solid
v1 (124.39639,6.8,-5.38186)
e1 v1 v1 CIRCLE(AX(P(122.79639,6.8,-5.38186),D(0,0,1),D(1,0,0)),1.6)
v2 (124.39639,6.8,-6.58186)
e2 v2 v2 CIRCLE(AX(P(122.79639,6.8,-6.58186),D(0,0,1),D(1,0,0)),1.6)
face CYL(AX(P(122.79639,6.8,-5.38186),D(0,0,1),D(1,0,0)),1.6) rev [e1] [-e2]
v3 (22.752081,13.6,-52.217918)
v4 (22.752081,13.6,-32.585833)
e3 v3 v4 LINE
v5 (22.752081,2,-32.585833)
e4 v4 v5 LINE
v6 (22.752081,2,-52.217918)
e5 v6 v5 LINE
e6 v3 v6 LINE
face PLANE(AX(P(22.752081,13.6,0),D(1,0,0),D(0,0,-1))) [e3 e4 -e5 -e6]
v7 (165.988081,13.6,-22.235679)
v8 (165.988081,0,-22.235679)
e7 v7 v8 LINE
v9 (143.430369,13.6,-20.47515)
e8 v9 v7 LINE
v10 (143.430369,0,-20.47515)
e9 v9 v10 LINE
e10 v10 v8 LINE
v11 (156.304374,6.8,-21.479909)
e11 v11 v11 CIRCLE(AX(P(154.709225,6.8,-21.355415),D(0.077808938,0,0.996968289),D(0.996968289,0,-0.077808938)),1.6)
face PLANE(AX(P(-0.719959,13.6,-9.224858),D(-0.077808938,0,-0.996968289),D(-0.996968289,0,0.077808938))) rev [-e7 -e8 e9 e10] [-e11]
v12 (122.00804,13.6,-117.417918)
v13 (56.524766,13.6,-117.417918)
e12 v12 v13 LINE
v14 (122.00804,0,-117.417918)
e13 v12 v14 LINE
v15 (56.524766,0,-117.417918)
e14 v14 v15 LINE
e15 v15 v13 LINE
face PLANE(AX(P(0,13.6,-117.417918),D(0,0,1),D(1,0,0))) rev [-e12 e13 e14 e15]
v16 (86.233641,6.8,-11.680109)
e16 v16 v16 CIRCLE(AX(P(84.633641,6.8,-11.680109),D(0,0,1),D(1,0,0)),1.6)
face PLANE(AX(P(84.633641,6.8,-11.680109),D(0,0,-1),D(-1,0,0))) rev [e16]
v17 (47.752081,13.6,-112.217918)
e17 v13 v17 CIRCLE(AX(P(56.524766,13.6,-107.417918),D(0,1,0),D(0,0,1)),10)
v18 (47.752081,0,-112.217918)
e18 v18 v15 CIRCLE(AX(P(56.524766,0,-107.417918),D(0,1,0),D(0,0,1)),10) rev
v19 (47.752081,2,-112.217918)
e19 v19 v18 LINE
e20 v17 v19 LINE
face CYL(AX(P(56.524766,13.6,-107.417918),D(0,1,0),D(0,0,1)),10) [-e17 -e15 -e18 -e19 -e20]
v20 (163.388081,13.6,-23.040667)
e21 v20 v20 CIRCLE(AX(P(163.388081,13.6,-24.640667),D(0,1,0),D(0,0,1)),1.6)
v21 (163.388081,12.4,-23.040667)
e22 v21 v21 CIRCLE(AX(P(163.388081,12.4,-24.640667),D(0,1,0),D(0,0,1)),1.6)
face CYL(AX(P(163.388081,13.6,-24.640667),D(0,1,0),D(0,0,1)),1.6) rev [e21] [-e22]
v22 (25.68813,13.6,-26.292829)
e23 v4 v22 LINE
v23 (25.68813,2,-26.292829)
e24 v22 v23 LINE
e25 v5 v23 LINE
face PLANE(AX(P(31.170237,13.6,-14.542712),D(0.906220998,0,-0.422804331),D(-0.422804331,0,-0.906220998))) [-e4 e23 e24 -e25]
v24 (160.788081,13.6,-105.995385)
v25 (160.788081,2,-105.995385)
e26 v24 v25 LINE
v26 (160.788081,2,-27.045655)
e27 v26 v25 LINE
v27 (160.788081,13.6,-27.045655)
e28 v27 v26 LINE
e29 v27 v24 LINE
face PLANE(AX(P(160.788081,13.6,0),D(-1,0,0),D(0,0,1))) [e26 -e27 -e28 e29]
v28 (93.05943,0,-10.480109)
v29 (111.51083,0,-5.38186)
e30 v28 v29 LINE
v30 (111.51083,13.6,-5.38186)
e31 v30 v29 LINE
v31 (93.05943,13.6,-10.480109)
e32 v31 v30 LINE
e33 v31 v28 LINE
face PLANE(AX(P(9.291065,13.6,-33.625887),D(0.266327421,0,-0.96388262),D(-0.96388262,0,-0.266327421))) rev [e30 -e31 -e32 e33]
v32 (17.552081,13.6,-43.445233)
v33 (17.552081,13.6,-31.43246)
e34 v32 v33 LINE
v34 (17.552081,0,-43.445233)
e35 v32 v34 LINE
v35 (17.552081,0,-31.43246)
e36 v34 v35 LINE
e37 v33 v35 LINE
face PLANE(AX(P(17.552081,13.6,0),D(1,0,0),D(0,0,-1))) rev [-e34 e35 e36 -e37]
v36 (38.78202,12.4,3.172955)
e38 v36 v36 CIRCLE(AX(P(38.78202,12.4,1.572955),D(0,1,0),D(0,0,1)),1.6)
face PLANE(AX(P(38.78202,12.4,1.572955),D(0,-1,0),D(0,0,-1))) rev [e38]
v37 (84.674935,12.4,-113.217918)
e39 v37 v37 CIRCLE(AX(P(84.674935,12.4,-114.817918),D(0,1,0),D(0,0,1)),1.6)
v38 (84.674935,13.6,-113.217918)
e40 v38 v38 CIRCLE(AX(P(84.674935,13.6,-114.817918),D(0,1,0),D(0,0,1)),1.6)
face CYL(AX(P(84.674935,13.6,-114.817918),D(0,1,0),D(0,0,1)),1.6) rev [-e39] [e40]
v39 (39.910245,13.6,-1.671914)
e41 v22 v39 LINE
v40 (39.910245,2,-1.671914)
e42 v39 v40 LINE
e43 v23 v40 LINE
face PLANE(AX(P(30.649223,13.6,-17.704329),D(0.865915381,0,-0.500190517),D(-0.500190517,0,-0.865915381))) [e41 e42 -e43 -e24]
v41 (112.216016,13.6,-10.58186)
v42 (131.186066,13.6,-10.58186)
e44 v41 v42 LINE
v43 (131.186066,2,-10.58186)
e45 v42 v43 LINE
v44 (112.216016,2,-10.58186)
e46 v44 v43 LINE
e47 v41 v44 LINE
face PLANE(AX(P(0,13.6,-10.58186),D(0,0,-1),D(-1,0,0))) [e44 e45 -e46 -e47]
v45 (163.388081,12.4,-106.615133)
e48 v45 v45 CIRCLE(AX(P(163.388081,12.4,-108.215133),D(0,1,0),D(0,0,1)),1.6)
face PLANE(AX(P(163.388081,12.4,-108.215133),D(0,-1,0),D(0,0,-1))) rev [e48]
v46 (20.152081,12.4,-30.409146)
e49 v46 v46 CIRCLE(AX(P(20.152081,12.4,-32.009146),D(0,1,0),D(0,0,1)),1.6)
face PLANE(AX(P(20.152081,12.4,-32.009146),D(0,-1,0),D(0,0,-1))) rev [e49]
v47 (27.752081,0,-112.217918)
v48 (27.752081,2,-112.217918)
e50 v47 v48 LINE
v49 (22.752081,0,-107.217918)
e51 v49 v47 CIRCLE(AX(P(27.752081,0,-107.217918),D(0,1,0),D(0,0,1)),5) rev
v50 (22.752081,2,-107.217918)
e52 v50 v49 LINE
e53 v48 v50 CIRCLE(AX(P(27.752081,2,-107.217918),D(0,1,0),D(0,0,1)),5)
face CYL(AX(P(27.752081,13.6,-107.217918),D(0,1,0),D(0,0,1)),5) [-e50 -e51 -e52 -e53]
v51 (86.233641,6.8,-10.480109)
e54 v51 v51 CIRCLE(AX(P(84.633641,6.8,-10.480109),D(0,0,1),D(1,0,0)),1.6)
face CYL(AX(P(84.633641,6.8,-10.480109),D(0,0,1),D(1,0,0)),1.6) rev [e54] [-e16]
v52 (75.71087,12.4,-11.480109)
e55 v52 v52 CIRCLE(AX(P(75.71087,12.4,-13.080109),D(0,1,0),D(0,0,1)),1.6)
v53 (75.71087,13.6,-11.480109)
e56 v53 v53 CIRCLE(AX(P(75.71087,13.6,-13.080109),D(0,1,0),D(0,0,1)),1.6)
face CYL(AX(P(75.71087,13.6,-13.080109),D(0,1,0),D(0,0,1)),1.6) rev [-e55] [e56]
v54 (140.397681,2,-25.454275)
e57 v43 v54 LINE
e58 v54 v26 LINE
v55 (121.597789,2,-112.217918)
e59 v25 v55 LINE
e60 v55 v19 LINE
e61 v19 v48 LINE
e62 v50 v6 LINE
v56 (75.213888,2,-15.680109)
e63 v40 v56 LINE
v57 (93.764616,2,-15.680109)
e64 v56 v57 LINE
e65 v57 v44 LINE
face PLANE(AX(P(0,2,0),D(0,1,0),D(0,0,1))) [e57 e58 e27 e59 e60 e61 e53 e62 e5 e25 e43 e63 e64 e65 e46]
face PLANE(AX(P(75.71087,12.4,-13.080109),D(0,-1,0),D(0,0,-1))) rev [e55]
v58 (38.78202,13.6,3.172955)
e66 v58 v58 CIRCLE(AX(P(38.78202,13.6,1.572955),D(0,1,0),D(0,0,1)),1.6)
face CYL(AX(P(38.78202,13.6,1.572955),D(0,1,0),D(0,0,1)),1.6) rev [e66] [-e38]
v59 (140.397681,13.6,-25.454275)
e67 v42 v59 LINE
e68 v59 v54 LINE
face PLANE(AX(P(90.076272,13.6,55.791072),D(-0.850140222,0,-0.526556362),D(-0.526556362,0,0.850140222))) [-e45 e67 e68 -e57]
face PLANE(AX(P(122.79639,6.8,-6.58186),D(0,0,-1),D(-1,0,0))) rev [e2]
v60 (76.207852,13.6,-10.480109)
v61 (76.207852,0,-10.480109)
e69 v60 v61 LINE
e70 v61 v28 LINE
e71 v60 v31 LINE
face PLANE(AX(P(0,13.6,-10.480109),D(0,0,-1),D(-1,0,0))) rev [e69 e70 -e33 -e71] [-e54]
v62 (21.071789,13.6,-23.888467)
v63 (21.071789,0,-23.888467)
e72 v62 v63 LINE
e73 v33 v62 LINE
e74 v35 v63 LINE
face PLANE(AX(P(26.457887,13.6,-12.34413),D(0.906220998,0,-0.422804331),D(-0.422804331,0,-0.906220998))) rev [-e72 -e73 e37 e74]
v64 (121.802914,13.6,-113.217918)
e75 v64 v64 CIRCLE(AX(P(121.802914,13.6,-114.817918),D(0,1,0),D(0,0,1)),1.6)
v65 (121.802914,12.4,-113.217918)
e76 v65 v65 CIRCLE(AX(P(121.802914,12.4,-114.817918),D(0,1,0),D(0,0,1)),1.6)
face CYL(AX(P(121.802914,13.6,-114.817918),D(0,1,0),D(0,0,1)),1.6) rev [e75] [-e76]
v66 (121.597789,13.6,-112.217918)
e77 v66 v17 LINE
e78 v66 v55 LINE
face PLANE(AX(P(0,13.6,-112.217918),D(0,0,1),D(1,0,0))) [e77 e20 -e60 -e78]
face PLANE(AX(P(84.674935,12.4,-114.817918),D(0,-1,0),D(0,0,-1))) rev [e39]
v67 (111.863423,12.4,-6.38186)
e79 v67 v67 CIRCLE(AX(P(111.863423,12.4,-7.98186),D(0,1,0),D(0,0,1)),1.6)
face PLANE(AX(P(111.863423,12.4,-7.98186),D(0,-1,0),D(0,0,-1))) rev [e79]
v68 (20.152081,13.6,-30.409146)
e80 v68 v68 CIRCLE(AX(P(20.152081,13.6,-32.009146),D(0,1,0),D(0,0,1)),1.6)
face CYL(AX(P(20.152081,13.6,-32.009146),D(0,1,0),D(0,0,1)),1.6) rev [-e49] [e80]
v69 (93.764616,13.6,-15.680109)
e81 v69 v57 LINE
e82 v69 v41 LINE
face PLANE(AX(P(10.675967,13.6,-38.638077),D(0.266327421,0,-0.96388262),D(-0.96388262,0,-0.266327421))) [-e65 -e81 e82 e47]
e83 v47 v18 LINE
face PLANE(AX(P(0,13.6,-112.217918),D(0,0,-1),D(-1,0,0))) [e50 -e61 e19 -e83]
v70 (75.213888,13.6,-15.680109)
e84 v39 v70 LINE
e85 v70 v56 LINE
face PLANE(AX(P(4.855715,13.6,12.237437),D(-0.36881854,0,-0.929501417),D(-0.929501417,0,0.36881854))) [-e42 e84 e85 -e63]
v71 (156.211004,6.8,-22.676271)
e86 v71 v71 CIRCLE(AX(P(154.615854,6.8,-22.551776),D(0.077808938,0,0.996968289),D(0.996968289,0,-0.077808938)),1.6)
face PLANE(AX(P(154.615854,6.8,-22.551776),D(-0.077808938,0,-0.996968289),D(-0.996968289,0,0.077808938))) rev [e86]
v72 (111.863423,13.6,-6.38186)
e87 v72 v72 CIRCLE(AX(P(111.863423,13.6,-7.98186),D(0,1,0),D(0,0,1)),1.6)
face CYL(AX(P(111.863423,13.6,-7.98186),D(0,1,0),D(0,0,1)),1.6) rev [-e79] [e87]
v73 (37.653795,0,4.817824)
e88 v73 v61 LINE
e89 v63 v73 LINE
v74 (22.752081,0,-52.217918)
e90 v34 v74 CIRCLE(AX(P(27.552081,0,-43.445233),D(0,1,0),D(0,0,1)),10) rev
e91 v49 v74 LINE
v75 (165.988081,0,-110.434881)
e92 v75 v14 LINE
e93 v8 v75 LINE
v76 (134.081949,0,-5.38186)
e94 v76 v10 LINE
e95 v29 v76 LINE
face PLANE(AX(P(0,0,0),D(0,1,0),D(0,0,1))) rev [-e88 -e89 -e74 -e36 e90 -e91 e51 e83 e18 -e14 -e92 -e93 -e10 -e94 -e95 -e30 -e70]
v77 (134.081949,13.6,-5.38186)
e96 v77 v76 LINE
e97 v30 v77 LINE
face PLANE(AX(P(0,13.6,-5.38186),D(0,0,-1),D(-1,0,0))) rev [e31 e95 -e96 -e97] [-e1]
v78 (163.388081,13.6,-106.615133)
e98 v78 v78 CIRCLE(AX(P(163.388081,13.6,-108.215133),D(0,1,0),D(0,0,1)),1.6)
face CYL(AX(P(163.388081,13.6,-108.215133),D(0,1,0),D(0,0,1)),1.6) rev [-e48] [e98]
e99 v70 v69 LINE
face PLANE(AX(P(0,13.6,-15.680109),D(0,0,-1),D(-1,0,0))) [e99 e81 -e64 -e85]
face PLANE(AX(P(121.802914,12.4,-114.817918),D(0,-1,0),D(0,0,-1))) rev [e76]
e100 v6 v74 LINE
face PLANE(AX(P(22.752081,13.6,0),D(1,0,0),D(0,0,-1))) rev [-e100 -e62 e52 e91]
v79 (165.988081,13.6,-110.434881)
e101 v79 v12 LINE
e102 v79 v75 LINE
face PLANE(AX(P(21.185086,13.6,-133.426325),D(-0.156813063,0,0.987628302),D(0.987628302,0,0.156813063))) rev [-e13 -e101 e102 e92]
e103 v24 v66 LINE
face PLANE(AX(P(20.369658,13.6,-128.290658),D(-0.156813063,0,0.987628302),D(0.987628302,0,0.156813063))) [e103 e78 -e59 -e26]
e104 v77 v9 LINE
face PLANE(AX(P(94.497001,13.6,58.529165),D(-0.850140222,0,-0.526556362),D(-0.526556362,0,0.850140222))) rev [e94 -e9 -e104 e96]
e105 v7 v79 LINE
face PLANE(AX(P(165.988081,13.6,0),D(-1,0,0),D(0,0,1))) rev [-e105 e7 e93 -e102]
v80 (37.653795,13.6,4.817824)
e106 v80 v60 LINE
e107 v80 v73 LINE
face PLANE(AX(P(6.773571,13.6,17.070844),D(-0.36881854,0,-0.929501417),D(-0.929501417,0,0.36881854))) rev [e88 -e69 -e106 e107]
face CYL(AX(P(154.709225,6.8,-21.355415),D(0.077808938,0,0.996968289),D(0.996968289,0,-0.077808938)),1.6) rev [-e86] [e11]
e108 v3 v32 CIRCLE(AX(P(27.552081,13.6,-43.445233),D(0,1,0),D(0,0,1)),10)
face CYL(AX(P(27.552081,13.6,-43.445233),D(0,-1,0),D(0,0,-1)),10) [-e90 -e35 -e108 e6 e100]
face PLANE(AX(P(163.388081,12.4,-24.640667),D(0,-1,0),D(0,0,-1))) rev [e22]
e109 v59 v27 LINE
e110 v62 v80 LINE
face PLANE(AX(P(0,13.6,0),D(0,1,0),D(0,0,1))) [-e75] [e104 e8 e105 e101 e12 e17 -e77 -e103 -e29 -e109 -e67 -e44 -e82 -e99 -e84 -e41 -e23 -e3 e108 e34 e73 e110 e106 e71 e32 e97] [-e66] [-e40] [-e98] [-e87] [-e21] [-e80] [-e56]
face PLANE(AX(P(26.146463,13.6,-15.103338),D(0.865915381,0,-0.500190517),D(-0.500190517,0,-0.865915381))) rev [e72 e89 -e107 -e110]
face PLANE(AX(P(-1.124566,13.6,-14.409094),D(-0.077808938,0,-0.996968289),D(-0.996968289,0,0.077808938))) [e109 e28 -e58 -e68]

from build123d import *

# Parameters (mm, degrees)
BOSS_EXTRUDE1_DEPTH = 2
BOSS_EXTRUDE2_DEPTH = 13.6
CUT_EXTRUDE1_DEPTH  = 204.774312539
TOP_HOLES_D         = 3.2
TOP_HOLES_DEPTH     = 1.2
WRIST_1_D           = 3.2
WRIST_1_DEPTH       = 1.2
WRIST_2_D           = 3.2
WRIST_2_DEPTH       = 1.2
WRIST_3_D           = 3.2
WRIST_3_DEPTH       = 1.2
FILLET1_R           = 5
FILLET2_R           = 10
FILLET3_R           = 10


with BuildPart() as part:
    # outline → Boss-Extrude1 (new body)
    with BuildSketch(Plane(origin=(0, 0, 0), x_dir=(1, 0, 0), z_dir=(0, 1, 0))):
        Polygon((22.752080985, 112.217917805), (22.752080985, 32.585832501), (25.688129691, 26.292829341), (39.910245267, 1.671913524), (75.213887712, 15.680109343), (93.764616437, 15.680109343), (112.21601573, 10.581860359), (131.186066133, 10.581860359), (140.397681326, 25.454275085), (160.788080985, 27.045655036), (160.788080985, 105.9953847), (121.597788595, 112.217917805), align=None)
    extrude(amount=BOSS_EXTRUDE1_DEPTH)

    # outline<7> → Boss-Extrude2 (add)
    with BuildSketch(Plane(origin=(0, 0, 0), x_dir=(1, 0, 0), z_dir=(0, 1, 0))):
        Polygon((165.988080985, 110.434880876), (122.008040315, 117.417917805), (17.552080985, 117.417917805), (17.552080985, 31.432460189), (21.071788866, 23.888466533), (37.653795388, -4.817824349), (76.207852469, 10.480109343), (93.059430407, 10.480109343), (111.510829699, 5.381860359), (134.081949487, 5.381860359), (143.430369308, 20.475150048), (165.988080985, 22.235679058), align=None)
        Polygon((121.597788595, 112.217917805), (22.752080985, 112.217917805), (22.752080985, 32.585832501), (25.688129691, 26.292829341), (39.910245267, 1.671913524), (75.213887712, 15.680109343), (93.764616437, 15.680109343), (112.21601573, 10.581860359), (131.186066133, 10.581860359), (140.397681326, 25.454275085), (160.788080985, 27.045655036), (160.788080985, 105.9953847), align=None, mode=Mode.SUBTRACT)
    extrude(amount=BOSS_EXTRUDE2_DEPTH)

    # cutout → Cut-Extrude1 (cut, through all)
    with BuildSketch(Plane(origin=(0, 0, 0), x_dir=(1, 0, 0), z_dir=(0, 1, 0))):
        Polygon((17.552080985, 117.417917805), (17.552080985, 52.217917805), (22.752080985, 52.217917805), (22.752080985, 112.217917805), (47.752080985, 112.217917805), (47.752080985, 117.417917805), align=None)
    extrude(amount=CUT_EXTRUDE1_DEPTH, mode=Mode.SUBTRACT)

    # top holes
    with Locations(Plane(origin=(0, 13.6, 0), x_dir=(1, 0, 0), z_dir=(0, 1, 0))):
        with Locations((84.67493479, 114.817917805), (20.152080985, 32.009146345), (38.782020327, -1.572955412), (75.710870091, 13.080109343), (111.863422715, 7.981860359), (163.388080985, 24.640667047), (163.388080985, 108.215132788), (121.802914455, 114.817917805)):
            Hole(TOP_HOLES_D / 2, depth=TOP_HOLES_DEPTH)

    # wrist 1
    with Locations(Plane.XY.offset(-10.480109343)):
        with Locations((84.633641438, 6.8)):
            Hole(WRIST_1_D / 2, depth=WRIST_1_DEPTH)

    # wrist 2
    with Locations(Plane.XY.offset(-5.381860359)):
        with Locations((122.796389593, 6.8)):
            Hole(WRIST_2_D / 2, depth=WRIST_2_DEPTH)

    # wrist 3
    with Locations(Plane(origin=(-0.719959147, 0, -9.224858415), x_dir=(0.9969682889311796, 0, -0.07780893821172487), z_dir=(0.07780893821172487, 0, 0.9969682889311796))):
        with Locations((155.901833608, 6.8)):
            Hole(WRIST_3_D / 2, depth=WRIST_3_DEPTH)

    # Fillet1
    fillet1_edges = [part.edges().sort_by_distance(p)[0] for p in [
        (22.752080985, 1, -112.217917805),
    ]]
    fillet(fillet1_edges, radius=FILLET1_R)

    # Fillet2
    # the kernel refuses this fillet: 10 mm, written as the material it takes off along each edge
    with BuildSketch(Plane(origin=(47.752080985, -21.931712199, -117.417917805), x_dir=(0, 0, 1), z_dir=(0, 1, 0))) as fillet2_piece_1:
        with BuildLine():
            CenterArc((10, 8.77268488), FILLET2_R, 180, 61.314597986)
            Line((0, 8.77268488), (-0.2, 8.77268488))
            Line((-0.2, 8.77268488), (-0.2, 0))
            Line((-0.2, 0), (0, -0.2))
            ThreePointArc((0, -0.2), (2.6, -0.2), (5.104, -0.175453698))
            Line((5.104, -0.175453698), (5.2, 0))
        make_face()
    extrude(amount=57.463424399, mode=Mode.SUBTRACT)

    # Fillet3
    # the kernel refuses this fillet: 10 mm, written as the material it takes off along each edge
    with BuildSketch(Plane(origin=(17.552080985, -21.931712199, -52.217917805), x_dir=(0, 0, 1), z_dir=(0, 1, 0))) as fillet3_piece_1:
        with BuildLine():
            CenterArc((8.77268488, 10), FILLET3_R, 208.685402014, 61.314597986)
            Line((0, 5.2), (-0.175453698, 5.104))
            ThreePointArc((-0.175453698, 5.104), (-0.2, 2.6), (-0.2, 0))
            Line((-0.2, 0), (0, -0.2))
            Line((0, -0.2), (8.77268488, -0.2))
            Line((8.77268488, -0.2), (8.77268488, 0))
        make_face()
    extrude(amount=57.463424399, mode=Mode.SUBTRACT)


solid = part.part
